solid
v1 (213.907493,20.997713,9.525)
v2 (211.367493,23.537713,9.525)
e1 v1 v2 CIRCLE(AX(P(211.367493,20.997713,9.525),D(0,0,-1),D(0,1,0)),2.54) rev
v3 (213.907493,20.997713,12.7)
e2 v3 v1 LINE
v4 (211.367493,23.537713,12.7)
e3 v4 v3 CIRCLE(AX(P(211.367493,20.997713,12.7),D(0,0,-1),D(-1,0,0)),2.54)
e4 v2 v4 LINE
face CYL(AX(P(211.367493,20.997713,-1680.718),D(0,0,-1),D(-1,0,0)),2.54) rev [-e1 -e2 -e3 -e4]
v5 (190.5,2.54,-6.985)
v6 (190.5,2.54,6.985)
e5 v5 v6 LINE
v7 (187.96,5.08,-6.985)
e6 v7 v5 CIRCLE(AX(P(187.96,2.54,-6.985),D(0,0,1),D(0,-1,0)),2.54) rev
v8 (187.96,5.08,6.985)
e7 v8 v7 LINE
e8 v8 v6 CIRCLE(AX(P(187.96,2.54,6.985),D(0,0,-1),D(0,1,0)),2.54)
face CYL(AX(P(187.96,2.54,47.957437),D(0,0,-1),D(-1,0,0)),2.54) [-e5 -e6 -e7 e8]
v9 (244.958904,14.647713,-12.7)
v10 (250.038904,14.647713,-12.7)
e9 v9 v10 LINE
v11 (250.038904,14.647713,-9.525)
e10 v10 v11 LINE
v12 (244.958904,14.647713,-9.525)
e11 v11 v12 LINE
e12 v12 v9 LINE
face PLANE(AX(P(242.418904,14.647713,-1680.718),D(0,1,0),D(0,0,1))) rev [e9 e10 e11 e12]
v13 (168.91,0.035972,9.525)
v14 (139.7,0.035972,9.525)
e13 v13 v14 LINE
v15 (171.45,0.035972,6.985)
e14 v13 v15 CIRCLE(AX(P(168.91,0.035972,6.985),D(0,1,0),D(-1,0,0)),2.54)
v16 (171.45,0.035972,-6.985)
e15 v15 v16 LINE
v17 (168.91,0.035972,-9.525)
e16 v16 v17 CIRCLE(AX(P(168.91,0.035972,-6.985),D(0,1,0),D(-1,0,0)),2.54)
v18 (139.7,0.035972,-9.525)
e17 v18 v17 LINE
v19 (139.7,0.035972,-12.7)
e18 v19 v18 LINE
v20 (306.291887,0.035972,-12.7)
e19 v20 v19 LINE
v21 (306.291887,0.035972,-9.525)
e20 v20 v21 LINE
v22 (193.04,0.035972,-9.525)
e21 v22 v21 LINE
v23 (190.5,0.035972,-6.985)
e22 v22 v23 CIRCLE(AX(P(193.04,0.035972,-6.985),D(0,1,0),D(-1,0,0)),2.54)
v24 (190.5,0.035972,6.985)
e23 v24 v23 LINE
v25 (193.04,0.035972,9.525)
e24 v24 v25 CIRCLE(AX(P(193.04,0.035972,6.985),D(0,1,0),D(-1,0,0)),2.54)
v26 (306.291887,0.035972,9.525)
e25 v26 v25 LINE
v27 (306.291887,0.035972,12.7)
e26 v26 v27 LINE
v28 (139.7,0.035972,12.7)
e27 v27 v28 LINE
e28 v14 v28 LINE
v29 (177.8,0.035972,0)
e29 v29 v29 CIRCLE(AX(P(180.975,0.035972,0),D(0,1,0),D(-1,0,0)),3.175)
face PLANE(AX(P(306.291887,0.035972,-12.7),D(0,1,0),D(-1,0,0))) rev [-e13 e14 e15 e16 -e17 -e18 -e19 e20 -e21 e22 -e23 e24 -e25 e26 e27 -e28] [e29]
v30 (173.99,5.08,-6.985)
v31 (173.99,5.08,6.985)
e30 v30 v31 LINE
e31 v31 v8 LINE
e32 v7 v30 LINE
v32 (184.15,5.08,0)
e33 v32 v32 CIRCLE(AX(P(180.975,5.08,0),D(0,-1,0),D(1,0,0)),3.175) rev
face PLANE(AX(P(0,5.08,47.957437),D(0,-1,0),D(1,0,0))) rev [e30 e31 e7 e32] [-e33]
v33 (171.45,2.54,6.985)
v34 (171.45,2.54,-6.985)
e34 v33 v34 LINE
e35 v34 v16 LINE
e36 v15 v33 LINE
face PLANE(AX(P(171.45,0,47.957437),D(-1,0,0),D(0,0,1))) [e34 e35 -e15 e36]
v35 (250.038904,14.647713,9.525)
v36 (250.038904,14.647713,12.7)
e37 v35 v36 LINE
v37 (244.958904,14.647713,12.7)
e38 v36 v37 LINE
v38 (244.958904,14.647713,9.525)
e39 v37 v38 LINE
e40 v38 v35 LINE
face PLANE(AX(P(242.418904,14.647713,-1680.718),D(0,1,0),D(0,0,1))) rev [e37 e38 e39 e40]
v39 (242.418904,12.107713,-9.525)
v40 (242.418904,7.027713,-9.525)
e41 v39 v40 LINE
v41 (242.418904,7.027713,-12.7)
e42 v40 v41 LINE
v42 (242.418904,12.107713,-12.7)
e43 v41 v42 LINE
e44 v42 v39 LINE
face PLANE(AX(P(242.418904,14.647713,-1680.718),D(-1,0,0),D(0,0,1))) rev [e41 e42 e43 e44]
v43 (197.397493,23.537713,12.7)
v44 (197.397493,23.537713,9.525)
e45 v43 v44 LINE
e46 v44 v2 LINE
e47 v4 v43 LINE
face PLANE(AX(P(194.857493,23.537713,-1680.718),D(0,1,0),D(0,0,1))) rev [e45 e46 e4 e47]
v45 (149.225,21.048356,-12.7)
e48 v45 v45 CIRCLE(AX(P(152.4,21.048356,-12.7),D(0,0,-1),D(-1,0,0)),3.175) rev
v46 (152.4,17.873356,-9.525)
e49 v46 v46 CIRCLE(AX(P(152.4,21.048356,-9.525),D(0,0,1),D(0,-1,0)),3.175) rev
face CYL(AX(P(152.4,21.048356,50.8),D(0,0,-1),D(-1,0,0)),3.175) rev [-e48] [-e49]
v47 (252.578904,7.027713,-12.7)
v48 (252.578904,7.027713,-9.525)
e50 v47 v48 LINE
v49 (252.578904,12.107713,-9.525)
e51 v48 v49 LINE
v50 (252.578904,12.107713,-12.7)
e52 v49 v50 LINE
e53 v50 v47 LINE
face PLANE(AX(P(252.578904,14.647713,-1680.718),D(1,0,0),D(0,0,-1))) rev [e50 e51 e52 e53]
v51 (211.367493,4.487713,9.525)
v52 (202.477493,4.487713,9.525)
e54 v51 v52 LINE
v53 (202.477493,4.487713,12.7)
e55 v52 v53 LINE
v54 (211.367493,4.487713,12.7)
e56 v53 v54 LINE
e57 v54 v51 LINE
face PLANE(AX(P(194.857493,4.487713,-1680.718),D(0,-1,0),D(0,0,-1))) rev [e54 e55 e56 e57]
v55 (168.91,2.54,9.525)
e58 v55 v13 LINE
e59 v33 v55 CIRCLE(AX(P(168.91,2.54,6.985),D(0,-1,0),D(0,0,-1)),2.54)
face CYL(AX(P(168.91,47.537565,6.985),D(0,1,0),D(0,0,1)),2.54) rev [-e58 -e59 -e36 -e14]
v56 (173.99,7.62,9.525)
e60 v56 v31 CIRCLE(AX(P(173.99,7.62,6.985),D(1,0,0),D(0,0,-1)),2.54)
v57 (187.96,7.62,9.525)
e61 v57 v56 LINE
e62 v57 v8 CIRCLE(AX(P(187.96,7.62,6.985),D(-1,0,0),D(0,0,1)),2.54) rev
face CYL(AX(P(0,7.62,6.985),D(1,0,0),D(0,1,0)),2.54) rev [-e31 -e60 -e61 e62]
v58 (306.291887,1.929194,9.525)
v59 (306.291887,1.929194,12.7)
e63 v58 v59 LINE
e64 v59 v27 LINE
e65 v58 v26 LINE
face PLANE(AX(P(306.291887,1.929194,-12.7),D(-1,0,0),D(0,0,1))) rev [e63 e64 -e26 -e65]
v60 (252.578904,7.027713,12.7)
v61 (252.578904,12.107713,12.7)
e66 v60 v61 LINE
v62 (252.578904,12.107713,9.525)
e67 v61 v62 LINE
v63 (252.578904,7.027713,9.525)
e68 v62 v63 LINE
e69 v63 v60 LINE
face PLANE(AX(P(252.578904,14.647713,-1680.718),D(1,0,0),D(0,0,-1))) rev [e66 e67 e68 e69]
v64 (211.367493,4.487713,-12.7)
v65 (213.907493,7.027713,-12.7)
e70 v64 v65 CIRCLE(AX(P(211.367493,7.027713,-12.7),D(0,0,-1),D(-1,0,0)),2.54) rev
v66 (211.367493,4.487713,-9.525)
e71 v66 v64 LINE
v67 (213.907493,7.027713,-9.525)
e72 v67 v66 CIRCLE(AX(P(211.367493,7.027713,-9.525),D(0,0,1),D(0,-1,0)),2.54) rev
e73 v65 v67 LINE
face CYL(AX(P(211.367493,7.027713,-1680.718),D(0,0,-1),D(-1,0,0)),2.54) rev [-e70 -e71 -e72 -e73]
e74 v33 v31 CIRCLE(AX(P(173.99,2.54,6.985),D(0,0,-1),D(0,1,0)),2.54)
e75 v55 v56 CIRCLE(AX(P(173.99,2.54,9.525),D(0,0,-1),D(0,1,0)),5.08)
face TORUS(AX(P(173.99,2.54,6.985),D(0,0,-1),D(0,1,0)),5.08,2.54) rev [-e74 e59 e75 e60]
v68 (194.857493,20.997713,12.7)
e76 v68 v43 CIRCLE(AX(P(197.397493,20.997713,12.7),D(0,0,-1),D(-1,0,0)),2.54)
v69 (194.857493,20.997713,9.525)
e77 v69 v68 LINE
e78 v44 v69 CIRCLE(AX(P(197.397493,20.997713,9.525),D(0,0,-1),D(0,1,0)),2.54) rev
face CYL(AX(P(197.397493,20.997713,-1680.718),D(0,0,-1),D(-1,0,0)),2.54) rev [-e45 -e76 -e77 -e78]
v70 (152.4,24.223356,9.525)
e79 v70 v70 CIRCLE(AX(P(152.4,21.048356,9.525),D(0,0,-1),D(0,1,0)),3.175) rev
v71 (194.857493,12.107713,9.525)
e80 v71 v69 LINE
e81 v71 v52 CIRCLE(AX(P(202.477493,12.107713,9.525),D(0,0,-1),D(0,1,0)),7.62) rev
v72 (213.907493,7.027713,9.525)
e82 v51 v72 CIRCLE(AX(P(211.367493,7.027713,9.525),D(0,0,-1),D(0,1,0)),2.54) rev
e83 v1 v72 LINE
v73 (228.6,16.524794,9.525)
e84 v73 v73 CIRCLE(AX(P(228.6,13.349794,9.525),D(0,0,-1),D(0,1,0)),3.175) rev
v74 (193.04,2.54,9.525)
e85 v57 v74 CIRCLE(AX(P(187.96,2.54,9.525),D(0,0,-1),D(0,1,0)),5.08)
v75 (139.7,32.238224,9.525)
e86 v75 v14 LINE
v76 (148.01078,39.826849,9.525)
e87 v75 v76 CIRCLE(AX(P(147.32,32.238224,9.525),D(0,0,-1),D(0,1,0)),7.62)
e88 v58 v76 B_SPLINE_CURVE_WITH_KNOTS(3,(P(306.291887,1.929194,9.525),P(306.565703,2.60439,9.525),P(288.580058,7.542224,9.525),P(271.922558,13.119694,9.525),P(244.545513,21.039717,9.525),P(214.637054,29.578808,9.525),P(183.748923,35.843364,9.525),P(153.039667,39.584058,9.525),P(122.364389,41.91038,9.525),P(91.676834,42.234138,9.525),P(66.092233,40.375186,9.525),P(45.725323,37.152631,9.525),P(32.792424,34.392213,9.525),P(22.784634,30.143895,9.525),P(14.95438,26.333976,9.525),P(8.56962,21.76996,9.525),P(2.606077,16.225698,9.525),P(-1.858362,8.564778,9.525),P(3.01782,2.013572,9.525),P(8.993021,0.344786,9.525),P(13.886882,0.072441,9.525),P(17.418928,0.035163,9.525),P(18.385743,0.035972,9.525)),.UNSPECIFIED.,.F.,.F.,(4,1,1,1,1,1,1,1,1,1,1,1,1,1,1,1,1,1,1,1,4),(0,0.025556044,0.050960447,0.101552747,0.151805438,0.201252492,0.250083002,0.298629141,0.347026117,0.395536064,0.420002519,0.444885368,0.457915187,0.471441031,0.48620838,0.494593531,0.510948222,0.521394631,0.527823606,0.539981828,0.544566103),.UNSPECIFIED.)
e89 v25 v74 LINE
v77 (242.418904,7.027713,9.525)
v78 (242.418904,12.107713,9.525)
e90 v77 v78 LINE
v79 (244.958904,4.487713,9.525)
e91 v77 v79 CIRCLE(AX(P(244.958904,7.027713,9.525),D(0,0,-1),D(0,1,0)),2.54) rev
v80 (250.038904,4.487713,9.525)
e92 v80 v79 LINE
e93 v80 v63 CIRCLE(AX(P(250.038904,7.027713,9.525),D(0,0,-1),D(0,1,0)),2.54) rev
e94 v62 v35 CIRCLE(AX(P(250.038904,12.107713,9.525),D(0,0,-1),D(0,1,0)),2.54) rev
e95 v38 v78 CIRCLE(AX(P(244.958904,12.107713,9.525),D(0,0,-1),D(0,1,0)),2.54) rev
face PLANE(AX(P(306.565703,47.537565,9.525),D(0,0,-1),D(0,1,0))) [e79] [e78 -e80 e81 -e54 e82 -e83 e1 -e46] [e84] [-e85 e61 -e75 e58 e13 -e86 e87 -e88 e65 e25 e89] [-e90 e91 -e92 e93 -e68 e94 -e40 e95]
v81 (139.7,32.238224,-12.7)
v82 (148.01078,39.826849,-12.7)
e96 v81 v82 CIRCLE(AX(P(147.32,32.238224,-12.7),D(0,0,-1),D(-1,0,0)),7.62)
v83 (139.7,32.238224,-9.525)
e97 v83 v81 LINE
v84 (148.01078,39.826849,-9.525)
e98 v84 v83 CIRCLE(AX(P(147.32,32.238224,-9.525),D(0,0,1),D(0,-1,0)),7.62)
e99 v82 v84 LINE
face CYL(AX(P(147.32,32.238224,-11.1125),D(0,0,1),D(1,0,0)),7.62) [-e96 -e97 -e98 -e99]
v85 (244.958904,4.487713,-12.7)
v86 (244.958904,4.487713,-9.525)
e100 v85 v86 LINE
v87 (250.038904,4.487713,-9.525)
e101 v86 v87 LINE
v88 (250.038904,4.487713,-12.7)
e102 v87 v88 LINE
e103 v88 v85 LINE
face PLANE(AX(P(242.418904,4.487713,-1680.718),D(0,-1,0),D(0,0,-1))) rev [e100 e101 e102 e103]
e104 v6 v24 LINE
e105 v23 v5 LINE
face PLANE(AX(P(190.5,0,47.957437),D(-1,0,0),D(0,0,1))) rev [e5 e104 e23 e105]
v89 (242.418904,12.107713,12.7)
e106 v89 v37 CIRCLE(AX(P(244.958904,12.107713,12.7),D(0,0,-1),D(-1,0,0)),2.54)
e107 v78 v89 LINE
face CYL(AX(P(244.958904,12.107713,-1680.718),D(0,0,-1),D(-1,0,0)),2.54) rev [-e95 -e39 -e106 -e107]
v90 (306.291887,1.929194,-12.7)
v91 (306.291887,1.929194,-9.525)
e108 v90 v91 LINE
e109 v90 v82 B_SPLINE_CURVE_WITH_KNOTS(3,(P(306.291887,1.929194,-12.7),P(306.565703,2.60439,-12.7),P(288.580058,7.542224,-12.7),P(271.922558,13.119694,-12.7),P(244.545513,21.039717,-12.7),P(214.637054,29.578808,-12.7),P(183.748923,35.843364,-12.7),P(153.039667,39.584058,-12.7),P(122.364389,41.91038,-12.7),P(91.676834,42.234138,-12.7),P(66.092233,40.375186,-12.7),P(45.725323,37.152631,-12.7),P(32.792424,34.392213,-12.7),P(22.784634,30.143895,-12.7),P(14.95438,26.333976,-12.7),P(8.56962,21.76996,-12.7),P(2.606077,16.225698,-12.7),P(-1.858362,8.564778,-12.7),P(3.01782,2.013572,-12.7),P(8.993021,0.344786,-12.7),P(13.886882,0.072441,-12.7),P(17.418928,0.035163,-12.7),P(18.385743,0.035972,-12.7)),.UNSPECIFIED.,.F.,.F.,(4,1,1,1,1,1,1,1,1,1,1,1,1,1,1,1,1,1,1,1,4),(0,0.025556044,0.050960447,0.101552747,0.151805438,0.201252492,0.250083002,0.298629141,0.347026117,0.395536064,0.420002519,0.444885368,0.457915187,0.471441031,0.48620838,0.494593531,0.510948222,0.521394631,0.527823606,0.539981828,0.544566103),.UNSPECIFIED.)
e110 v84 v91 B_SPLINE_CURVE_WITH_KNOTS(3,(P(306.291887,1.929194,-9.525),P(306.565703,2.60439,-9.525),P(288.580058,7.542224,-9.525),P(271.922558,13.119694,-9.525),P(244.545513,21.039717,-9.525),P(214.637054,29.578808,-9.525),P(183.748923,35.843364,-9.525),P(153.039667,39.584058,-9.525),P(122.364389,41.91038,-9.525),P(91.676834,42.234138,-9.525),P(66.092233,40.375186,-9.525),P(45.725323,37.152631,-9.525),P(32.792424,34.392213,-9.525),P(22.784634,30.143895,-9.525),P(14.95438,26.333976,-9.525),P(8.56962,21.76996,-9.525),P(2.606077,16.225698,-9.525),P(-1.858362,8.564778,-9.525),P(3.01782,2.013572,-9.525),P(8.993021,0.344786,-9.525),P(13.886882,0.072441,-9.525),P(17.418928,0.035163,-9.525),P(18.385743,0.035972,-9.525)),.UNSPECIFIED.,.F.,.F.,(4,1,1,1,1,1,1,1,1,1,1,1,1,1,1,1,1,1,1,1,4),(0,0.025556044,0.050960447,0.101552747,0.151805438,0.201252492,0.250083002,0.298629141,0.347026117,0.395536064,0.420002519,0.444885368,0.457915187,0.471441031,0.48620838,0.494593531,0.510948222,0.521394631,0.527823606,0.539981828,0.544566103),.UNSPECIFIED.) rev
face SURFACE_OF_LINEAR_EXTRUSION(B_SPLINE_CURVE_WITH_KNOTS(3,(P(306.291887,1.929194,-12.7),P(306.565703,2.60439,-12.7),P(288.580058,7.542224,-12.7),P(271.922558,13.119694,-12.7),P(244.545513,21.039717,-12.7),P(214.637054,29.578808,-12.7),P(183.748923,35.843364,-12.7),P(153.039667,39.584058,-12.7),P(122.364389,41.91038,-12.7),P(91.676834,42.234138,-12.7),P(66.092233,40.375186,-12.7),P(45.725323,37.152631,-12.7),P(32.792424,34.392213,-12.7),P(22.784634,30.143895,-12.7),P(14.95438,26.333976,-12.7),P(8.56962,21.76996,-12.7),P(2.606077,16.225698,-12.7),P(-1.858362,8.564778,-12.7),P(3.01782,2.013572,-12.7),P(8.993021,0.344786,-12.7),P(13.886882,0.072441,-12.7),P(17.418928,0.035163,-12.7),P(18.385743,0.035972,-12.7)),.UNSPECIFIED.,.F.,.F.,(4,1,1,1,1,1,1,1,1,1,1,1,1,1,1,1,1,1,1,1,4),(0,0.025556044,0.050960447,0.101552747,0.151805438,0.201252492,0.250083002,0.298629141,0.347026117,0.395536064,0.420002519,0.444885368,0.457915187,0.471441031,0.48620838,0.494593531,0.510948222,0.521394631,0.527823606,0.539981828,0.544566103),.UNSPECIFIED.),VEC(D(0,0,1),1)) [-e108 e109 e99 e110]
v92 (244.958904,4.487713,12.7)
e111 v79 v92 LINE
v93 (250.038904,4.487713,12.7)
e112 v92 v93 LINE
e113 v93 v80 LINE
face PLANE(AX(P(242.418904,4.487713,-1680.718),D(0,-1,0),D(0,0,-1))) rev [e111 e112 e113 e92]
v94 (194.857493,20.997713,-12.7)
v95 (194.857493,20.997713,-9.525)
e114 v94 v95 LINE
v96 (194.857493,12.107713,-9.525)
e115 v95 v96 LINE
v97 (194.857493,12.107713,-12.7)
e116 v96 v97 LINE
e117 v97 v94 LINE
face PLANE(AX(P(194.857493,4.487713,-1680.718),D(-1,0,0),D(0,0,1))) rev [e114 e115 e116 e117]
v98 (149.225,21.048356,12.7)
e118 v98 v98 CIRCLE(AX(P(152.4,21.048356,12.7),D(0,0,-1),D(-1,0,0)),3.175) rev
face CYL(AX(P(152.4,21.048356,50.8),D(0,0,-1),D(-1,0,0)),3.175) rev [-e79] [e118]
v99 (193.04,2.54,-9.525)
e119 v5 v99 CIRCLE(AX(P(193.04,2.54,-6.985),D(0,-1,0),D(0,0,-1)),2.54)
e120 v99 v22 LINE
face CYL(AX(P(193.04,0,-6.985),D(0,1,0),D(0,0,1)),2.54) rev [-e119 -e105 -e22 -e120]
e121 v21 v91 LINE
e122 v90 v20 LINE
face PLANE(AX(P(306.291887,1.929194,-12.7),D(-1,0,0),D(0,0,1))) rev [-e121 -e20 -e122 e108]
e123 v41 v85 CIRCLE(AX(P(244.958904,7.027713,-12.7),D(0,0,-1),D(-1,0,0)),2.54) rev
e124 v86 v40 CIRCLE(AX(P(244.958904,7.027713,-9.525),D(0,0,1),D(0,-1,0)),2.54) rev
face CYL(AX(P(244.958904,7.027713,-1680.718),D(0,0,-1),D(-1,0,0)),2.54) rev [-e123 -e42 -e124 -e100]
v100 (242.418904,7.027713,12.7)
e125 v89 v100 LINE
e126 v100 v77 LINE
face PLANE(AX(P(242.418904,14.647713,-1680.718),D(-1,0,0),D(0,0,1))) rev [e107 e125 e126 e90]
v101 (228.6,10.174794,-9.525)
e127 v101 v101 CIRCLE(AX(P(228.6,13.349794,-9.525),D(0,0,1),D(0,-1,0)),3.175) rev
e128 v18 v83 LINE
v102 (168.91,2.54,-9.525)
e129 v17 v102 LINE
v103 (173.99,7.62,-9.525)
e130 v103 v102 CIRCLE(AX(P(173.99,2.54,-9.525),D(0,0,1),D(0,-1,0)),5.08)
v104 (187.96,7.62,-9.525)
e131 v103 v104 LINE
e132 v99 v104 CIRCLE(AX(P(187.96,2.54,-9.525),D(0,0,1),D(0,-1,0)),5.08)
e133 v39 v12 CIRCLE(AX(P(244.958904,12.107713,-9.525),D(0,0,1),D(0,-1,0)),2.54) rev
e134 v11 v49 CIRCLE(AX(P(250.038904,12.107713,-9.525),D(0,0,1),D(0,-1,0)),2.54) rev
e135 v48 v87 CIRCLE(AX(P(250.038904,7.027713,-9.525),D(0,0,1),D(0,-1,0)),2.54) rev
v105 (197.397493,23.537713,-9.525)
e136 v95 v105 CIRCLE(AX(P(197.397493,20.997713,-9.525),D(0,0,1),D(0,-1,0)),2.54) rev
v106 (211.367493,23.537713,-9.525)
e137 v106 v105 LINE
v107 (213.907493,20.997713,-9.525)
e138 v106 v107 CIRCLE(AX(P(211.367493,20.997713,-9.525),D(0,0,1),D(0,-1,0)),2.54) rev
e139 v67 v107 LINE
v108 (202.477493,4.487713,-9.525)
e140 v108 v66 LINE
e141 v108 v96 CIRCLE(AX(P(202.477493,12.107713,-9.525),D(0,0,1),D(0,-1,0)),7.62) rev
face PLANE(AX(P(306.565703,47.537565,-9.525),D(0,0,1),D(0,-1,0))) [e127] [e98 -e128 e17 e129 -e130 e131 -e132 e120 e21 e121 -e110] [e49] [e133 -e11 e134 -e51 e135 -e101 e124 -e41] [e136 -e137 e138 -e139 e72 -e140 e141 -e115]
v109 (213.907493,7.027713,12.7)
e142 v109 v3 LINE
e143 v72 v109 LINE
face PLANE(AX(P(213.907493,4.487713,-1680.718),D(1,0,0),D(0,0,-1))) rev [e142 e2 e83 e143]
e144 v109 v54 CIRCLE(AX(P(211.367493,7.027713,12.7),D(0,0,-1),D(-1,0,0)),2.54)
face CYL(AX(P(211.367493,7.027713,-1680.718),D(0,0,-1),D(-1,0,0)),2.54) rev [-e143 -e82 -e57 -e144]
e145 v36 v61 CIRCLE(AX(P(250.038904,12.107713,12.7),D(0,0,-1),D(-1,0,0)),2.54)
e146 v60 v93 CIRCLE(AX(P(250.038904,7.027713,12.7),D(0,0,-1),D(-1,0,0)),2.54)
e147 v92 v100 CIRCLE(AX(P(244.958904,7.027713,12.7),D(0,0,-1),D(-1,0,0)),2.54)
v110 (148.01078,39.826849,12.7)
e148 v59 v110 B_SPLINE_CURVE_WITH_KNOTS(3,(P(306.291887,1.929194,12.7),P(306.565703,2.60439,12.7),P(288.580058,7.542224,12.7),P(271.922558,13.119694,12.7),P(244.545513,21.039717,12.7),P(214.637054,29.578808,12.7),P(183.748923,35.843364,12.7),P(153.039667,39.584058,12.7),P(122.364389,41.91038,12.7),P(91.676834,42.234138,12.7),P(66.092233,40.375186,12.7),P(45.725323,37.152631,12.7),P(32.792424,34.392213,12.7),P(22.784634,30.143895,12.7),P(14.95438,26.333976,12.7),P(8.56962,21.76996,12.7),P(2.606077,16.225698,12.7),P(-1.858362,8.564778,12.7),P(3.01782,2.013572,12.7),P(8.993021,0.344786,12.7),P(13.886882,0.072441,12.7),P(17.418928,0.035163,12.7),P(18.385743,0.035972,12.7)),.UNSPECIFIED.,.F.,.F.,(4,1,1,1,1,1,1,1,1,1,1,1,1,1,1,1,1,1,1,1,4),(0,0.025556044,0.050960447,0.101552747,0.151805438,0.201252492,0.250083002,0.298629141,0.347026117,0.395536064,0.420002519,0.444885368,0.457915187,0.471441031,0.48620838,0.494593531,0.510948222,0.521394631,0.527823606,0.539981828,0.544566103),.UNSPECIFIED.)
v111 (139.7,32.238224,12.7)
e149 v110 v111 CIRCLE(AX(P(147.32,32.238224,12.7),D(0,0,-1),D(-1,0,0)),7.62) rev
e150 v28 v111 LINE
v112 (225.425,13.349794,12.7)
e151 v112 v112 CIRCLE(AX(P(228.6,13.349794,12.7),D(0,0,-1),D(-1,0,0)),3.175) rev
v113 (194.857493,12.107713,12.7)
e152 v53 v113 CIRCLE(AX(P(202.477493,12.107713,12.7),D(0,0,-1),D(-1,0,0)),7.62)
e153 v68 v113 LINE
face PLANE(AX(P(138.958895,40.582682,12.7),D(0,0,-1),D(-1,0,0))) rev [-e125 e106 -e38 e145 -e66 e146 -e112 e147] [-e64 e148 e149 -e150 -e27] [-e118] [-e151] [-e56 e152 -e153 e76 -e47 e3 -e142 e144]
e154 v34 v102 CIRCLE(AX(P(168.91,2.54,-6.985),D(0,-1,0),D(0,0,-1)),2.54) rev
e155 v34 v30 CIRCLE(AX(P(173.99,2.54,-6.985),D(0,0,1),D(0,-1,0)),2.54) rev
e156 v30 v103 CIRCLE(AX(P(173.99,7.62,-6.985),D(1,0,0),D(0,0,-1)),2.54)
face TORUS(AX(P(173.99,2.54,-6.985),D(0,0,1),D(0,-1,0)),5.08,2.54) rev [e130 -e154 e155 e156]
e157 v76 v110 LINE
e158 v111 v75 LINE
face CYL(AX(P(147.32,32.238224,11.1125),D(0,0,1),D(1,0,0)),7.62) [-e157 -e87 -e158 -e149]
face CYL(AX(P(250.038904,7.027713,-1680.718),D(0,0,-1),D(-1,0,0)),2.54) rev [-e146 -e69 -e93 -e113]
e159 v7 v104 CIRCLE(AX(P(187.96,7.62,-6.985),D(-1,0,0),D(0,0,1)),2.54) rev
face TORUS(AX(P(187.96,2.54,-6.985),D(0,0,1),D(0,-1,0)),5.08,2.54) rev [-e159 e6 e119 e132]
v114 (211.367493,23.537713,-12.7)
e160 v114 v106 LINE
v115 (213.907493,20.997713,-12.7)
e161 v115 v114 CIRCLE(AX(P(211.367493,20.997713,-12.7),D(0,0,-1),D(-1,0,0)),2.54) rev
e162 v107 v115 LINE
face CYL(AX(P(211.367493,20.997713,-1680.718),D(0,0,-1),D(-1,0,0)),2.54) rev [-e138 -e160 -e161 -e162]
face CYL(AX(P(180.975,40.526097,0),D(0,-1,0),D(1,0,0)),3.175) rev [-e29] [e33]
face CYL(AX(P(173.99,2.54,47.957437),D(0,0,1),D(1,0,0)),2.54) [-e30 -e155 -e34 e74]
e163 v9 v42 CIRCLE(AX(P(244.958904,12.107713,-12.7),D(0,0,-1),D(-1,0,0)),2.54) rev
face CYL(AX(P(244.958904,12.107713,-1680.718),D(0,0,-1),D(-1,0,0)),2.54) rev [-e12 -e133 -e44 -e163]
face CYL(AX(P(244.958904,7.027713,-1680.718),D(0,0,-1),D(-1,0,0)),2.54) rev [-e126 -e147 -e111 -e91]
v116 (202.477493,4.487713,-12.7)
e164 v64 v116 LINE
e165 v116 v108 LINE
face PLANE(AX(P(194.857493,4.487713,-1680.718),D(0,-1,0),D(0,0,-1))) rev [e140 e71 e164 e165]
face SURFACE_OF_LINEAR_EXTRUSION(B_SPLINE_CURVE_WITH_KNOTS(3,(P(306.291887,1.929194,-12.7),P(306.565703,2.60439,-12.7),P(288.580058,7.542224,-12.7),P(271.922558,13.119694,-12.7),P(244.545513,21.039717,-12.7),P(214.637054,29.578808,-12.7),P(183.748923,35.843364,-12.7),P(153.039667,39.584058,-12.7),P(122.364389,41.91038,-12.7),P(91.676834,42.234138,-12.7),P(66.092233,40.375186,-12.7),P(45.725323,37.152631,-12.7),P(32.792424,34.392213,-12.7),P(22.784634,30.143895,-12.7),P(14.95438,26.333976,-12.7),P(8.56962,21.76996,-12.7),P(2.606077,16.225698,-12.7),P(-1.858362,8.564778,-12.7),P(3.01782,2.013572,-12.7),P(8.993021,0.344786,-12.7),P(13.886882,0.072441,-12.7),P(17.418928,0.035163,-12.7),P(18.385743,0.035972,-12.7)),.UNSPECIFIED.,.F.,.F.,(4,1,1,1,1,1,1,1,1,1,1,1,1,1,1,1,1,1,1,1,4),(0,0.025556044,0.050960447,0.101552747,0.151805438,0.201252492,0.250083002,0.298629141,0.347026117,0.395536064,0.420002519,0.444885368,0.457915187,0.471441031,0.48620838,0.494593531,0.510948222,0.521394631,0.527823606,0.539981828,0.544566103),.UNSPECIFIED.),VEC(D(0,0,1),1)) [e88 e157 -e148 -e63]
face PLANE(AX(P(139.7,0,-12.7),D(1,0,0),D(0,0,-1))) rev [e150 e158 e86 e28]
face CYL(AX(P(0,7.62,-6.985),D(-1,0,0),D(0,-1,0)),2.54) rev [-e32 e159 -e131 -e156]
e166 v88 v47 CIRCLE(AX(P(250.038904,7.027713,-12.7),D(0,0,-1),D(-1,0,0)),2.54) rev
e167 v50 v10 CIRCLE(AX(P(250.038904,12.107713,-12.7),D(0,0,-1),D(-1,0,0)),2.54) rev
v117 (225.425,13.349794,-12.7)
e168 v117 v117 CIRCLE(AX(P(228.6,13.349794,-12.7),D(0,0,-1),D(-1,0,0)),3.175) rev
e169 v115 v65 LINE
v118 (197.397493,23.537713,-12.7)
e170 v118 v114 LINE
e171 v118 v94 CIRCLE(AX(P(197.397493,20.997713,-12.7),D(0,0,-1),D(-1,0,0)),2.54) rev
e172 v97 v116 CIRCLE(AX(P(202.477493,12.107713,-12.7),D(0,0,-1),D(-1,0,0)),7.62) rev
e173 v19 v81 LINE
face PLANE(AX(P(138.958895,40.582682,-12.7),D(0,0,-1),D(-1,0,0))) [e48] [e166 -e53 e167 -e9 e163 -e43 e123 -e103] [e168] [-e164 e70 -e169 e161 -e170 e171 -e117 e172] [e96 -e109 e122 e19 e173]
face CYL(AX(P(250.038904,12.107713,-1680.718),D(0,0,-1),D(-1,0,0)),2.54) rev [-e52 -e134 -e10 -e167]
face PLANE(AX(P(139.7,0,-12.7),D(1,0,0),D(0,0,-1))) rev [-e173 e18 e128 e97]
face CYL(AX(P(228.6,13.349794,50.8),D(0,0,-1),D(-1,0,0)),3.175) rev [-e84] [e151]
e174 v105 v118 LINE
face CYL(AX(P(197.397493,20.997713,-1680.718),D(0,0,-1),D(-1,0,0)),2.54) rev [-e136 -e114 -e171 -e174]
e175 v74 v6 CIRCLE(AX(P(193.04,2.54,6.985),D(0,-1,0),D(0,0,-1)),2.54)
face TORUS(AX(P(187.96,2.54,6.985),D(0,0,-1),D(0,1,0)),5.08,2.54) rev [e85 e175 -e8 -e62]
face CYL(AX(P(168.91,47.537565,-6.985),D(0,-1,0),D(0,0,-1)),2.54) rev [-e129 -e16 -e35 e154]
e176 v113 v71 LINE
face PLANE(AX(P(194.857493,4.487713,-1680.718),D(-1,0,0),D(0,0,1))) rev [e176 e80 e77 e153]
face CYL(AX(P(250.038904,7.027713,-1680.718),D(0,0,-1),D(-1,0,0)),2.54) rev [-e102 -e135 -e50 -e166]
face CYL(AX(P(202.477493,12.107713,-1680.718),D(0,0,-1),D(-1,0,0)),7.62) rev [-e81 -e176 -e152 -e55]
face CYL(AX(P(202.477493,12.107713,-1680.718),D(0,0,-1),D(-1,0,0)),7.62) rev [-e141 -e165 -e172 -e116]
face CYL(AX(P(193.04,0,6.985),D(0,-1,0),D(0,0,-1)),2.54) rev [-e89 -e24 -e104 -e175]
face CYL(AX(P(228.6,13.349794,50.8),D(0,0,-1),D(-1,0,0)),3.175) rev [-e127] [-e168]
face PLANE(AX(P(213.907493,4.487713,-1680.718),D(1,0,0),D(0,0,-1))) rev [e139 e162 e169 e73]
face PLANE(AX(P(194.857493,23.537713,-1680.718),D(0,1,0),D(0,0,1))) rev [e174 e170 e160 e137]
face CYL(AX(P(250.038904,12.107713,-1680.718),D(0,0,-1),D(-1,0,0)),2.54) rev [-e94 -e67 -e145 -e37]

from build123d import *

# Parameters (mm, degrees)
BOSS_EXTRUDE1_DEPTH       = 12.7
BOSS_EXTRUDE1_DEPTH_BACK  = 12.7
SKETCH2_W                 = 19.05
SKETCH2_H                 = 49.651656102
CUT_EXTRUDE1_DEPTH        = 310.423757716
BOSS_EXTRUDE2_OUTLINE_W   = 38.1
BOSS_EXTRUDE2_OUTLINE_H   = 5.044027725
BOSS_EXTRUDE2_OUTLINE_W_2 = 19.05
BOSS_EXTRUDE2_DEPTH       = 19.05
CUT_EXTRUDE3_DEPTH        = 50.8
CUT_EXTRUDE3_DEPTH_BACK   = 50.8
SKETCH12_R                = 9.525
SKETCH12_R_2              = 3.175
SKETCH12_R_3              = 5
FILLET8_R                 = 2.54
SKETCH13_R                = 9.525
SKETCH13_R_2              = 5
CUT_EXTRUDE4_DEPTH        = 311.204708703
CUT_EXTRUDE5_DEPTH        = 309.603621169
CUT_EXTRUDE5_DEPTH_BACK   = 309.603621169
SKETCH14_R                = 3.175
FILLET9_R                 = 7.62
SKETCH16_W                = 19.05
SKETCH16_H                = 19.05
SKETCH16_W_2              = 10.16
SKETCH16_H_2              = 10.16
CUT_EXTRUDE6_DEPTH        = 1693.418
FILLET10_R                = 7.62
FILLET11_R                = 2.54


# Read off the part's stored shape, not the designer's step: Boss-Extrude2
with BuildPart() as part:
    # Sketch1 → Boss-Extrude1 (new, two sides: drawn at the far end of the back side and taken through both)
    with BuildSketch(Plane.XY.offset(-BOSS_EXTRUDE1_DEPTH_BACK)):
        with BuildLine():
            Line((306.2918866, 1.929193729), (306.2918866, 0.035972275))
            Line((306.2918866, 0.035972275), (18.385743088, 0.035972275))
            add(Edge.make_bspline(
                [(306.2918866, 1.929193729), (306.565703117, 2.60439044), (288.5800577, 7.542224382), (271.922557924, 13.119693618), (244.545512993, 21.039717296), (214.63705438, 29.578808281), (183.74892315, 35.843363942), (153.039666672, 39.584058053), (122.364389131, 41.910380286), (91.676834287, 42.234137684), (66.092232531, 40.375185886), (45.725322729, 37.15263137), (32.792424184, 34.392213233), (22.784634494, 30.143895353), (14.954380304, 26.333975955), (8.569620221, 21.769960087), (2.606076707, 16.225698301), (-1.858362456, 8.564778309), (3.017819974, 2.013571533), (8.993020993, 0.344786487), (13.886881629, 0.072440703), (17.418928388, 0.035163036), (18.385743088, 0.035972275)],
                knots=[0, 0, 0, 0, 0.025556044, 0.050960447, 0.101552747, 0.151805438, 0.201252492, 0.250083002, 0.298629141, 0.347026117, 0.395536064, 0.420002519, 0.444885368, 0.457915187, 0.471441031, 0.48620838, 0.494593531, 0.510948222, 0.521394631, 0.527823606, 0.539981828, 0.544566103, 0.544566103, 0.544566103, 0.544566103], degree=3))
        make_face()
    extrude(amount=BOSS_EXTRUDE1_DEPTH + BOSS_EXTRUDE1_DEPTH_BACK)

    # Sketch2 → Cut-Extrude1 (cut, through all)
    with BuildSketch(Plane(origin=(0, 0, 0), x_dir=(0, 0, -1), z_dir=(1, 0, 0))):
        with Locations((0, 22.711736939)):
            Rectangle(SKETCH2_W, SKETCH2_H)
    extrude(amount=CUT_EXTRUDE1_DEPTH, mode=Mode.SUBTRACT)


with BuildPart() as cut_extrude1_piece_1:
    # of the separate pieces the step leaves, piece 1, a body of its own (cut_extrude1_pieces)
    add(part.part.solids().sort_by_distance((306.2918866, 0.035972275, 9.525))[0])



with BuildPart() as cut_extrude1_piece_2:
    # of the separate pieces the step leaves, piece 2, a body of its own (cut_extrude1_pieces)
    add(part.part.solids().sort_by_distance((306.2918866, 1.929193729, -9.525))[0])


with BuildPart() as cut_extrude1_piece_1_1:
    add(cut_extrude1_piece_1.part)

    add(cut_extrude1_piece_2.part)  # Boss-Extrude2 merges Cut-Extrude1 piece 2
    # Boss-Extrude2 outline → Boss-Extrude2 (add)
    with BuildSketch(Plane.XY.offset(-9.525)):
        with Locations((50.8, 2.557986137)):
            Rectangle(BOSS_EXTRUDE2_OUTLINE_W, BOSS_EXTRUDE2_OUTLINE_H)
        with Locations((180.975, 2.557986137)):
            Rectangle(BOSS_EXTRUDE2_OUTLINE_W_2, BOSS_EXTRUDE2_OUTLINE_H)
    extrude(amount=BOSS_EXTRUDE2_DEPTH)

    # Sketch12 → Cut-Extrude3 (cut, two sides: drawn at the far end of the back side and taken through both)
    with BuildSketch(Plane.XY.offset(-CUT_EXTRUDE3_DEPTH_BACK)):
        with Locations(Location((82.55, 21.048356458, 0), (0, 0, 180))):
            Circle(SKETCH12_R)
        with Locations(Location((152.4, 21.048356458, 0), (0, 0, 180))):
            Circle(SKETCH12_R_2)
        with Locations(Location((228.6, 13.349794258, 0), (0, 0, 180))):
            Circle(SKETCH12_R_2)
        with Locations(Location((117.475, 21.048356458, 0), (0, 0, 180))):
            Circle(SKETCH12_R_3)
    extrude(amount=CUT_EXTRUDE3_DEPTH + CUT_EXTRUDE3_DEPTH_BACK, mode=Mode.SUBTRACT)

    # Fillet8
    fillet8_edges = [cut_extrude1_piece_1_1.edges().sort_by_distance(p)[0] for p in [
        (50.8, 5.08, -9.525),
        (69.85, 2.557986138, -9.525),
        (50.8, 5.08, 9.525),
        (69.85, 2.557986138, 9.525),
        (171.45, 2.557986138, -9.525),
        (171.45, 5.08, 0),
        (180.975, 5.08, 9.525),
        (190.5, 5.08, 0),
        (180.975, 5.08, -9.525),
        (190.5, 2.557986138, 9.525),
        (190.5, 2.557986138, -9.525),
        (171.45, 2.557986138, 9.525),
        (69.85, 5.08, 0),
        (31.75, 2.557986138, 9.525),
        (31.75, 5.08, 0),
        (31.75, 2.557986138, -9.525),
    ]]
    fillet(fillet8_edges, radius=FILLET8_R)

    # Sketch13 → Cut-Extrude4 (cut, through all)
    with BuildSketch(Plane.XY.offset(12.7)):
        with BuildLine():
            Line((18.385743088, 0.035972275), (139.7, 0.035972275))
            Line((139.7, 0.035972275), (139.7, 40.526097112))
            add(Edge.make_bspline(
                [(139.7, 40.526097112), (133.912966058, 40.971759709), (117.928487598, 41.957179581), (91.676834287, 42.234137684), (66.092232531, 40.375185886), (45.725322729, 37.15263137), (32.792424184, 34.392213233), (22.784634494, 30.143895353), (14.954380304, 26.333975955), (8.569620221, 21.769960087), (2.606076707, 16.225698301), (-1.858362456, 8.564778309), (3.017819974, 2.013571533), (8.993020993, 0.344786487), (13.886881629, 0.072440703), (17.418928388, 0.035163036), (18.385743088, 0.035972275)],
                knots=[0.271108315, 0.271108315, 0.271108315, 0.271108315, 0.298629141, 0.347026117, 0.395536064, 0.420002519, 0.444885368, 0.457915187, 0.471441031, 0.48620838, 0.494593531, 0.510948222, 0.521394631, 0.527823606, 0.539981828, 0.544566103, 0.544566103, 0.544566103, 0.544566103], degree=3))
        make_face()
        with Locations((82.55, 21.048356458)):
            Circle(SKETCH13_R, mode=Mode.SUBTRACT)
        with Locations((117.475, 21.048356458)):
            Circle(SKETCH13_R_2, mode=Mode.SUBTRACT)
    extrude(amount=-CUT_EXTRUDE4_DEPTH, mode=Mode.SUBTRACT)

    # Sketch14 → Cut-Extrude5 (cut, two sides: drawn at the far end of the back side and taken through both)
    with BuildSketch(Plane(origin=(0, 5.08, 0), x_dir=(1, 0, 0), z_dir=(0, 1, 0)).offset(-CUT_EXTRUDE5_DEPTH_BACK)):
        with Locations((180.975, 0)):
            Circle(SKETCH14_R)
    extrude(amount=CUT_EXTRUDE5_DEPTH + CUT_EXTRUDE5_DEPTH_BACK, mode=Mode.SUBTRACT)

    # Fillet9
    fillet9_edges = [cut_extrude1_piece_1_1.edges().sort_by_distance(p)[0] for p in [
        (139.7, 40.526097112, 11.1125),
        (139.7, 40.526097112, -11.1125),
    ]]
    fillet(fillet9_edges, radius=FILLET9_R)

    # Sketch16 → Cut-Extrude6 (cut)
    with BuildSketch(Plane.XY.offset(12.7)):
        with Locations((204.382492583, 14.012712879)):
            Rectangle(SKETCH16_W, SKETCH16_H)
        with Locations((247.498903959, 9.567712879)):
            Rectangle(SKETCH16_W_2, SKETCH16_H_2)
    extrude(amount=-CUT_EXTRUDE6_DEPTH, mode=Mode.SUBTRACT)

    # Fillet10
    fillet10_edges = [cut_extrude1_piece_1_1.edges().sort_by_distance(p)[0] for p in [
        (194.857492583, 4.487712879, -11.1125),
        (194.857492583, 4.487712879, 11.1125),
    ]]
    fillet(fillet10_edges, radius=FILLET10_R)

    # Fillet11
    fillet11_edges = [cut_extrude1_piece_1_1.edges().sort_by_distance(p)[0] for p in [
        (194.857492583, 23.537712879, -11.1125),
        (213.907492583, 23.537712879, -11.1125),
        (213.907492583, 4.487712879, -11.1125),
        (194.857492583, 23.537712879, 11.1125),
        (213.907492583, 23.537712879, 11.1125),
        (213.907492583, 4.487712879, 11.1125),
        (242.418903959, 4.487712879, -11.1125),
        (242.418903959, 14.647712879, -11.1125),
        (252.578903959, 14.647712879, -11.1125),
        (252.578903959, 4.487712879, -11.1125),
        (242.418903959, 4.487712879, 11.1125),
        (242.418903959, 14.647712879, 11.1125),
        (252.578903959, 14.647712879, 11.1125),
        (252.578903959, 4.487712879, 11.1125),
    ]]
    fillet(fillet11_edges, radius=FILLET11_R)


solid = cut_extrude1_piece_1_1.part
